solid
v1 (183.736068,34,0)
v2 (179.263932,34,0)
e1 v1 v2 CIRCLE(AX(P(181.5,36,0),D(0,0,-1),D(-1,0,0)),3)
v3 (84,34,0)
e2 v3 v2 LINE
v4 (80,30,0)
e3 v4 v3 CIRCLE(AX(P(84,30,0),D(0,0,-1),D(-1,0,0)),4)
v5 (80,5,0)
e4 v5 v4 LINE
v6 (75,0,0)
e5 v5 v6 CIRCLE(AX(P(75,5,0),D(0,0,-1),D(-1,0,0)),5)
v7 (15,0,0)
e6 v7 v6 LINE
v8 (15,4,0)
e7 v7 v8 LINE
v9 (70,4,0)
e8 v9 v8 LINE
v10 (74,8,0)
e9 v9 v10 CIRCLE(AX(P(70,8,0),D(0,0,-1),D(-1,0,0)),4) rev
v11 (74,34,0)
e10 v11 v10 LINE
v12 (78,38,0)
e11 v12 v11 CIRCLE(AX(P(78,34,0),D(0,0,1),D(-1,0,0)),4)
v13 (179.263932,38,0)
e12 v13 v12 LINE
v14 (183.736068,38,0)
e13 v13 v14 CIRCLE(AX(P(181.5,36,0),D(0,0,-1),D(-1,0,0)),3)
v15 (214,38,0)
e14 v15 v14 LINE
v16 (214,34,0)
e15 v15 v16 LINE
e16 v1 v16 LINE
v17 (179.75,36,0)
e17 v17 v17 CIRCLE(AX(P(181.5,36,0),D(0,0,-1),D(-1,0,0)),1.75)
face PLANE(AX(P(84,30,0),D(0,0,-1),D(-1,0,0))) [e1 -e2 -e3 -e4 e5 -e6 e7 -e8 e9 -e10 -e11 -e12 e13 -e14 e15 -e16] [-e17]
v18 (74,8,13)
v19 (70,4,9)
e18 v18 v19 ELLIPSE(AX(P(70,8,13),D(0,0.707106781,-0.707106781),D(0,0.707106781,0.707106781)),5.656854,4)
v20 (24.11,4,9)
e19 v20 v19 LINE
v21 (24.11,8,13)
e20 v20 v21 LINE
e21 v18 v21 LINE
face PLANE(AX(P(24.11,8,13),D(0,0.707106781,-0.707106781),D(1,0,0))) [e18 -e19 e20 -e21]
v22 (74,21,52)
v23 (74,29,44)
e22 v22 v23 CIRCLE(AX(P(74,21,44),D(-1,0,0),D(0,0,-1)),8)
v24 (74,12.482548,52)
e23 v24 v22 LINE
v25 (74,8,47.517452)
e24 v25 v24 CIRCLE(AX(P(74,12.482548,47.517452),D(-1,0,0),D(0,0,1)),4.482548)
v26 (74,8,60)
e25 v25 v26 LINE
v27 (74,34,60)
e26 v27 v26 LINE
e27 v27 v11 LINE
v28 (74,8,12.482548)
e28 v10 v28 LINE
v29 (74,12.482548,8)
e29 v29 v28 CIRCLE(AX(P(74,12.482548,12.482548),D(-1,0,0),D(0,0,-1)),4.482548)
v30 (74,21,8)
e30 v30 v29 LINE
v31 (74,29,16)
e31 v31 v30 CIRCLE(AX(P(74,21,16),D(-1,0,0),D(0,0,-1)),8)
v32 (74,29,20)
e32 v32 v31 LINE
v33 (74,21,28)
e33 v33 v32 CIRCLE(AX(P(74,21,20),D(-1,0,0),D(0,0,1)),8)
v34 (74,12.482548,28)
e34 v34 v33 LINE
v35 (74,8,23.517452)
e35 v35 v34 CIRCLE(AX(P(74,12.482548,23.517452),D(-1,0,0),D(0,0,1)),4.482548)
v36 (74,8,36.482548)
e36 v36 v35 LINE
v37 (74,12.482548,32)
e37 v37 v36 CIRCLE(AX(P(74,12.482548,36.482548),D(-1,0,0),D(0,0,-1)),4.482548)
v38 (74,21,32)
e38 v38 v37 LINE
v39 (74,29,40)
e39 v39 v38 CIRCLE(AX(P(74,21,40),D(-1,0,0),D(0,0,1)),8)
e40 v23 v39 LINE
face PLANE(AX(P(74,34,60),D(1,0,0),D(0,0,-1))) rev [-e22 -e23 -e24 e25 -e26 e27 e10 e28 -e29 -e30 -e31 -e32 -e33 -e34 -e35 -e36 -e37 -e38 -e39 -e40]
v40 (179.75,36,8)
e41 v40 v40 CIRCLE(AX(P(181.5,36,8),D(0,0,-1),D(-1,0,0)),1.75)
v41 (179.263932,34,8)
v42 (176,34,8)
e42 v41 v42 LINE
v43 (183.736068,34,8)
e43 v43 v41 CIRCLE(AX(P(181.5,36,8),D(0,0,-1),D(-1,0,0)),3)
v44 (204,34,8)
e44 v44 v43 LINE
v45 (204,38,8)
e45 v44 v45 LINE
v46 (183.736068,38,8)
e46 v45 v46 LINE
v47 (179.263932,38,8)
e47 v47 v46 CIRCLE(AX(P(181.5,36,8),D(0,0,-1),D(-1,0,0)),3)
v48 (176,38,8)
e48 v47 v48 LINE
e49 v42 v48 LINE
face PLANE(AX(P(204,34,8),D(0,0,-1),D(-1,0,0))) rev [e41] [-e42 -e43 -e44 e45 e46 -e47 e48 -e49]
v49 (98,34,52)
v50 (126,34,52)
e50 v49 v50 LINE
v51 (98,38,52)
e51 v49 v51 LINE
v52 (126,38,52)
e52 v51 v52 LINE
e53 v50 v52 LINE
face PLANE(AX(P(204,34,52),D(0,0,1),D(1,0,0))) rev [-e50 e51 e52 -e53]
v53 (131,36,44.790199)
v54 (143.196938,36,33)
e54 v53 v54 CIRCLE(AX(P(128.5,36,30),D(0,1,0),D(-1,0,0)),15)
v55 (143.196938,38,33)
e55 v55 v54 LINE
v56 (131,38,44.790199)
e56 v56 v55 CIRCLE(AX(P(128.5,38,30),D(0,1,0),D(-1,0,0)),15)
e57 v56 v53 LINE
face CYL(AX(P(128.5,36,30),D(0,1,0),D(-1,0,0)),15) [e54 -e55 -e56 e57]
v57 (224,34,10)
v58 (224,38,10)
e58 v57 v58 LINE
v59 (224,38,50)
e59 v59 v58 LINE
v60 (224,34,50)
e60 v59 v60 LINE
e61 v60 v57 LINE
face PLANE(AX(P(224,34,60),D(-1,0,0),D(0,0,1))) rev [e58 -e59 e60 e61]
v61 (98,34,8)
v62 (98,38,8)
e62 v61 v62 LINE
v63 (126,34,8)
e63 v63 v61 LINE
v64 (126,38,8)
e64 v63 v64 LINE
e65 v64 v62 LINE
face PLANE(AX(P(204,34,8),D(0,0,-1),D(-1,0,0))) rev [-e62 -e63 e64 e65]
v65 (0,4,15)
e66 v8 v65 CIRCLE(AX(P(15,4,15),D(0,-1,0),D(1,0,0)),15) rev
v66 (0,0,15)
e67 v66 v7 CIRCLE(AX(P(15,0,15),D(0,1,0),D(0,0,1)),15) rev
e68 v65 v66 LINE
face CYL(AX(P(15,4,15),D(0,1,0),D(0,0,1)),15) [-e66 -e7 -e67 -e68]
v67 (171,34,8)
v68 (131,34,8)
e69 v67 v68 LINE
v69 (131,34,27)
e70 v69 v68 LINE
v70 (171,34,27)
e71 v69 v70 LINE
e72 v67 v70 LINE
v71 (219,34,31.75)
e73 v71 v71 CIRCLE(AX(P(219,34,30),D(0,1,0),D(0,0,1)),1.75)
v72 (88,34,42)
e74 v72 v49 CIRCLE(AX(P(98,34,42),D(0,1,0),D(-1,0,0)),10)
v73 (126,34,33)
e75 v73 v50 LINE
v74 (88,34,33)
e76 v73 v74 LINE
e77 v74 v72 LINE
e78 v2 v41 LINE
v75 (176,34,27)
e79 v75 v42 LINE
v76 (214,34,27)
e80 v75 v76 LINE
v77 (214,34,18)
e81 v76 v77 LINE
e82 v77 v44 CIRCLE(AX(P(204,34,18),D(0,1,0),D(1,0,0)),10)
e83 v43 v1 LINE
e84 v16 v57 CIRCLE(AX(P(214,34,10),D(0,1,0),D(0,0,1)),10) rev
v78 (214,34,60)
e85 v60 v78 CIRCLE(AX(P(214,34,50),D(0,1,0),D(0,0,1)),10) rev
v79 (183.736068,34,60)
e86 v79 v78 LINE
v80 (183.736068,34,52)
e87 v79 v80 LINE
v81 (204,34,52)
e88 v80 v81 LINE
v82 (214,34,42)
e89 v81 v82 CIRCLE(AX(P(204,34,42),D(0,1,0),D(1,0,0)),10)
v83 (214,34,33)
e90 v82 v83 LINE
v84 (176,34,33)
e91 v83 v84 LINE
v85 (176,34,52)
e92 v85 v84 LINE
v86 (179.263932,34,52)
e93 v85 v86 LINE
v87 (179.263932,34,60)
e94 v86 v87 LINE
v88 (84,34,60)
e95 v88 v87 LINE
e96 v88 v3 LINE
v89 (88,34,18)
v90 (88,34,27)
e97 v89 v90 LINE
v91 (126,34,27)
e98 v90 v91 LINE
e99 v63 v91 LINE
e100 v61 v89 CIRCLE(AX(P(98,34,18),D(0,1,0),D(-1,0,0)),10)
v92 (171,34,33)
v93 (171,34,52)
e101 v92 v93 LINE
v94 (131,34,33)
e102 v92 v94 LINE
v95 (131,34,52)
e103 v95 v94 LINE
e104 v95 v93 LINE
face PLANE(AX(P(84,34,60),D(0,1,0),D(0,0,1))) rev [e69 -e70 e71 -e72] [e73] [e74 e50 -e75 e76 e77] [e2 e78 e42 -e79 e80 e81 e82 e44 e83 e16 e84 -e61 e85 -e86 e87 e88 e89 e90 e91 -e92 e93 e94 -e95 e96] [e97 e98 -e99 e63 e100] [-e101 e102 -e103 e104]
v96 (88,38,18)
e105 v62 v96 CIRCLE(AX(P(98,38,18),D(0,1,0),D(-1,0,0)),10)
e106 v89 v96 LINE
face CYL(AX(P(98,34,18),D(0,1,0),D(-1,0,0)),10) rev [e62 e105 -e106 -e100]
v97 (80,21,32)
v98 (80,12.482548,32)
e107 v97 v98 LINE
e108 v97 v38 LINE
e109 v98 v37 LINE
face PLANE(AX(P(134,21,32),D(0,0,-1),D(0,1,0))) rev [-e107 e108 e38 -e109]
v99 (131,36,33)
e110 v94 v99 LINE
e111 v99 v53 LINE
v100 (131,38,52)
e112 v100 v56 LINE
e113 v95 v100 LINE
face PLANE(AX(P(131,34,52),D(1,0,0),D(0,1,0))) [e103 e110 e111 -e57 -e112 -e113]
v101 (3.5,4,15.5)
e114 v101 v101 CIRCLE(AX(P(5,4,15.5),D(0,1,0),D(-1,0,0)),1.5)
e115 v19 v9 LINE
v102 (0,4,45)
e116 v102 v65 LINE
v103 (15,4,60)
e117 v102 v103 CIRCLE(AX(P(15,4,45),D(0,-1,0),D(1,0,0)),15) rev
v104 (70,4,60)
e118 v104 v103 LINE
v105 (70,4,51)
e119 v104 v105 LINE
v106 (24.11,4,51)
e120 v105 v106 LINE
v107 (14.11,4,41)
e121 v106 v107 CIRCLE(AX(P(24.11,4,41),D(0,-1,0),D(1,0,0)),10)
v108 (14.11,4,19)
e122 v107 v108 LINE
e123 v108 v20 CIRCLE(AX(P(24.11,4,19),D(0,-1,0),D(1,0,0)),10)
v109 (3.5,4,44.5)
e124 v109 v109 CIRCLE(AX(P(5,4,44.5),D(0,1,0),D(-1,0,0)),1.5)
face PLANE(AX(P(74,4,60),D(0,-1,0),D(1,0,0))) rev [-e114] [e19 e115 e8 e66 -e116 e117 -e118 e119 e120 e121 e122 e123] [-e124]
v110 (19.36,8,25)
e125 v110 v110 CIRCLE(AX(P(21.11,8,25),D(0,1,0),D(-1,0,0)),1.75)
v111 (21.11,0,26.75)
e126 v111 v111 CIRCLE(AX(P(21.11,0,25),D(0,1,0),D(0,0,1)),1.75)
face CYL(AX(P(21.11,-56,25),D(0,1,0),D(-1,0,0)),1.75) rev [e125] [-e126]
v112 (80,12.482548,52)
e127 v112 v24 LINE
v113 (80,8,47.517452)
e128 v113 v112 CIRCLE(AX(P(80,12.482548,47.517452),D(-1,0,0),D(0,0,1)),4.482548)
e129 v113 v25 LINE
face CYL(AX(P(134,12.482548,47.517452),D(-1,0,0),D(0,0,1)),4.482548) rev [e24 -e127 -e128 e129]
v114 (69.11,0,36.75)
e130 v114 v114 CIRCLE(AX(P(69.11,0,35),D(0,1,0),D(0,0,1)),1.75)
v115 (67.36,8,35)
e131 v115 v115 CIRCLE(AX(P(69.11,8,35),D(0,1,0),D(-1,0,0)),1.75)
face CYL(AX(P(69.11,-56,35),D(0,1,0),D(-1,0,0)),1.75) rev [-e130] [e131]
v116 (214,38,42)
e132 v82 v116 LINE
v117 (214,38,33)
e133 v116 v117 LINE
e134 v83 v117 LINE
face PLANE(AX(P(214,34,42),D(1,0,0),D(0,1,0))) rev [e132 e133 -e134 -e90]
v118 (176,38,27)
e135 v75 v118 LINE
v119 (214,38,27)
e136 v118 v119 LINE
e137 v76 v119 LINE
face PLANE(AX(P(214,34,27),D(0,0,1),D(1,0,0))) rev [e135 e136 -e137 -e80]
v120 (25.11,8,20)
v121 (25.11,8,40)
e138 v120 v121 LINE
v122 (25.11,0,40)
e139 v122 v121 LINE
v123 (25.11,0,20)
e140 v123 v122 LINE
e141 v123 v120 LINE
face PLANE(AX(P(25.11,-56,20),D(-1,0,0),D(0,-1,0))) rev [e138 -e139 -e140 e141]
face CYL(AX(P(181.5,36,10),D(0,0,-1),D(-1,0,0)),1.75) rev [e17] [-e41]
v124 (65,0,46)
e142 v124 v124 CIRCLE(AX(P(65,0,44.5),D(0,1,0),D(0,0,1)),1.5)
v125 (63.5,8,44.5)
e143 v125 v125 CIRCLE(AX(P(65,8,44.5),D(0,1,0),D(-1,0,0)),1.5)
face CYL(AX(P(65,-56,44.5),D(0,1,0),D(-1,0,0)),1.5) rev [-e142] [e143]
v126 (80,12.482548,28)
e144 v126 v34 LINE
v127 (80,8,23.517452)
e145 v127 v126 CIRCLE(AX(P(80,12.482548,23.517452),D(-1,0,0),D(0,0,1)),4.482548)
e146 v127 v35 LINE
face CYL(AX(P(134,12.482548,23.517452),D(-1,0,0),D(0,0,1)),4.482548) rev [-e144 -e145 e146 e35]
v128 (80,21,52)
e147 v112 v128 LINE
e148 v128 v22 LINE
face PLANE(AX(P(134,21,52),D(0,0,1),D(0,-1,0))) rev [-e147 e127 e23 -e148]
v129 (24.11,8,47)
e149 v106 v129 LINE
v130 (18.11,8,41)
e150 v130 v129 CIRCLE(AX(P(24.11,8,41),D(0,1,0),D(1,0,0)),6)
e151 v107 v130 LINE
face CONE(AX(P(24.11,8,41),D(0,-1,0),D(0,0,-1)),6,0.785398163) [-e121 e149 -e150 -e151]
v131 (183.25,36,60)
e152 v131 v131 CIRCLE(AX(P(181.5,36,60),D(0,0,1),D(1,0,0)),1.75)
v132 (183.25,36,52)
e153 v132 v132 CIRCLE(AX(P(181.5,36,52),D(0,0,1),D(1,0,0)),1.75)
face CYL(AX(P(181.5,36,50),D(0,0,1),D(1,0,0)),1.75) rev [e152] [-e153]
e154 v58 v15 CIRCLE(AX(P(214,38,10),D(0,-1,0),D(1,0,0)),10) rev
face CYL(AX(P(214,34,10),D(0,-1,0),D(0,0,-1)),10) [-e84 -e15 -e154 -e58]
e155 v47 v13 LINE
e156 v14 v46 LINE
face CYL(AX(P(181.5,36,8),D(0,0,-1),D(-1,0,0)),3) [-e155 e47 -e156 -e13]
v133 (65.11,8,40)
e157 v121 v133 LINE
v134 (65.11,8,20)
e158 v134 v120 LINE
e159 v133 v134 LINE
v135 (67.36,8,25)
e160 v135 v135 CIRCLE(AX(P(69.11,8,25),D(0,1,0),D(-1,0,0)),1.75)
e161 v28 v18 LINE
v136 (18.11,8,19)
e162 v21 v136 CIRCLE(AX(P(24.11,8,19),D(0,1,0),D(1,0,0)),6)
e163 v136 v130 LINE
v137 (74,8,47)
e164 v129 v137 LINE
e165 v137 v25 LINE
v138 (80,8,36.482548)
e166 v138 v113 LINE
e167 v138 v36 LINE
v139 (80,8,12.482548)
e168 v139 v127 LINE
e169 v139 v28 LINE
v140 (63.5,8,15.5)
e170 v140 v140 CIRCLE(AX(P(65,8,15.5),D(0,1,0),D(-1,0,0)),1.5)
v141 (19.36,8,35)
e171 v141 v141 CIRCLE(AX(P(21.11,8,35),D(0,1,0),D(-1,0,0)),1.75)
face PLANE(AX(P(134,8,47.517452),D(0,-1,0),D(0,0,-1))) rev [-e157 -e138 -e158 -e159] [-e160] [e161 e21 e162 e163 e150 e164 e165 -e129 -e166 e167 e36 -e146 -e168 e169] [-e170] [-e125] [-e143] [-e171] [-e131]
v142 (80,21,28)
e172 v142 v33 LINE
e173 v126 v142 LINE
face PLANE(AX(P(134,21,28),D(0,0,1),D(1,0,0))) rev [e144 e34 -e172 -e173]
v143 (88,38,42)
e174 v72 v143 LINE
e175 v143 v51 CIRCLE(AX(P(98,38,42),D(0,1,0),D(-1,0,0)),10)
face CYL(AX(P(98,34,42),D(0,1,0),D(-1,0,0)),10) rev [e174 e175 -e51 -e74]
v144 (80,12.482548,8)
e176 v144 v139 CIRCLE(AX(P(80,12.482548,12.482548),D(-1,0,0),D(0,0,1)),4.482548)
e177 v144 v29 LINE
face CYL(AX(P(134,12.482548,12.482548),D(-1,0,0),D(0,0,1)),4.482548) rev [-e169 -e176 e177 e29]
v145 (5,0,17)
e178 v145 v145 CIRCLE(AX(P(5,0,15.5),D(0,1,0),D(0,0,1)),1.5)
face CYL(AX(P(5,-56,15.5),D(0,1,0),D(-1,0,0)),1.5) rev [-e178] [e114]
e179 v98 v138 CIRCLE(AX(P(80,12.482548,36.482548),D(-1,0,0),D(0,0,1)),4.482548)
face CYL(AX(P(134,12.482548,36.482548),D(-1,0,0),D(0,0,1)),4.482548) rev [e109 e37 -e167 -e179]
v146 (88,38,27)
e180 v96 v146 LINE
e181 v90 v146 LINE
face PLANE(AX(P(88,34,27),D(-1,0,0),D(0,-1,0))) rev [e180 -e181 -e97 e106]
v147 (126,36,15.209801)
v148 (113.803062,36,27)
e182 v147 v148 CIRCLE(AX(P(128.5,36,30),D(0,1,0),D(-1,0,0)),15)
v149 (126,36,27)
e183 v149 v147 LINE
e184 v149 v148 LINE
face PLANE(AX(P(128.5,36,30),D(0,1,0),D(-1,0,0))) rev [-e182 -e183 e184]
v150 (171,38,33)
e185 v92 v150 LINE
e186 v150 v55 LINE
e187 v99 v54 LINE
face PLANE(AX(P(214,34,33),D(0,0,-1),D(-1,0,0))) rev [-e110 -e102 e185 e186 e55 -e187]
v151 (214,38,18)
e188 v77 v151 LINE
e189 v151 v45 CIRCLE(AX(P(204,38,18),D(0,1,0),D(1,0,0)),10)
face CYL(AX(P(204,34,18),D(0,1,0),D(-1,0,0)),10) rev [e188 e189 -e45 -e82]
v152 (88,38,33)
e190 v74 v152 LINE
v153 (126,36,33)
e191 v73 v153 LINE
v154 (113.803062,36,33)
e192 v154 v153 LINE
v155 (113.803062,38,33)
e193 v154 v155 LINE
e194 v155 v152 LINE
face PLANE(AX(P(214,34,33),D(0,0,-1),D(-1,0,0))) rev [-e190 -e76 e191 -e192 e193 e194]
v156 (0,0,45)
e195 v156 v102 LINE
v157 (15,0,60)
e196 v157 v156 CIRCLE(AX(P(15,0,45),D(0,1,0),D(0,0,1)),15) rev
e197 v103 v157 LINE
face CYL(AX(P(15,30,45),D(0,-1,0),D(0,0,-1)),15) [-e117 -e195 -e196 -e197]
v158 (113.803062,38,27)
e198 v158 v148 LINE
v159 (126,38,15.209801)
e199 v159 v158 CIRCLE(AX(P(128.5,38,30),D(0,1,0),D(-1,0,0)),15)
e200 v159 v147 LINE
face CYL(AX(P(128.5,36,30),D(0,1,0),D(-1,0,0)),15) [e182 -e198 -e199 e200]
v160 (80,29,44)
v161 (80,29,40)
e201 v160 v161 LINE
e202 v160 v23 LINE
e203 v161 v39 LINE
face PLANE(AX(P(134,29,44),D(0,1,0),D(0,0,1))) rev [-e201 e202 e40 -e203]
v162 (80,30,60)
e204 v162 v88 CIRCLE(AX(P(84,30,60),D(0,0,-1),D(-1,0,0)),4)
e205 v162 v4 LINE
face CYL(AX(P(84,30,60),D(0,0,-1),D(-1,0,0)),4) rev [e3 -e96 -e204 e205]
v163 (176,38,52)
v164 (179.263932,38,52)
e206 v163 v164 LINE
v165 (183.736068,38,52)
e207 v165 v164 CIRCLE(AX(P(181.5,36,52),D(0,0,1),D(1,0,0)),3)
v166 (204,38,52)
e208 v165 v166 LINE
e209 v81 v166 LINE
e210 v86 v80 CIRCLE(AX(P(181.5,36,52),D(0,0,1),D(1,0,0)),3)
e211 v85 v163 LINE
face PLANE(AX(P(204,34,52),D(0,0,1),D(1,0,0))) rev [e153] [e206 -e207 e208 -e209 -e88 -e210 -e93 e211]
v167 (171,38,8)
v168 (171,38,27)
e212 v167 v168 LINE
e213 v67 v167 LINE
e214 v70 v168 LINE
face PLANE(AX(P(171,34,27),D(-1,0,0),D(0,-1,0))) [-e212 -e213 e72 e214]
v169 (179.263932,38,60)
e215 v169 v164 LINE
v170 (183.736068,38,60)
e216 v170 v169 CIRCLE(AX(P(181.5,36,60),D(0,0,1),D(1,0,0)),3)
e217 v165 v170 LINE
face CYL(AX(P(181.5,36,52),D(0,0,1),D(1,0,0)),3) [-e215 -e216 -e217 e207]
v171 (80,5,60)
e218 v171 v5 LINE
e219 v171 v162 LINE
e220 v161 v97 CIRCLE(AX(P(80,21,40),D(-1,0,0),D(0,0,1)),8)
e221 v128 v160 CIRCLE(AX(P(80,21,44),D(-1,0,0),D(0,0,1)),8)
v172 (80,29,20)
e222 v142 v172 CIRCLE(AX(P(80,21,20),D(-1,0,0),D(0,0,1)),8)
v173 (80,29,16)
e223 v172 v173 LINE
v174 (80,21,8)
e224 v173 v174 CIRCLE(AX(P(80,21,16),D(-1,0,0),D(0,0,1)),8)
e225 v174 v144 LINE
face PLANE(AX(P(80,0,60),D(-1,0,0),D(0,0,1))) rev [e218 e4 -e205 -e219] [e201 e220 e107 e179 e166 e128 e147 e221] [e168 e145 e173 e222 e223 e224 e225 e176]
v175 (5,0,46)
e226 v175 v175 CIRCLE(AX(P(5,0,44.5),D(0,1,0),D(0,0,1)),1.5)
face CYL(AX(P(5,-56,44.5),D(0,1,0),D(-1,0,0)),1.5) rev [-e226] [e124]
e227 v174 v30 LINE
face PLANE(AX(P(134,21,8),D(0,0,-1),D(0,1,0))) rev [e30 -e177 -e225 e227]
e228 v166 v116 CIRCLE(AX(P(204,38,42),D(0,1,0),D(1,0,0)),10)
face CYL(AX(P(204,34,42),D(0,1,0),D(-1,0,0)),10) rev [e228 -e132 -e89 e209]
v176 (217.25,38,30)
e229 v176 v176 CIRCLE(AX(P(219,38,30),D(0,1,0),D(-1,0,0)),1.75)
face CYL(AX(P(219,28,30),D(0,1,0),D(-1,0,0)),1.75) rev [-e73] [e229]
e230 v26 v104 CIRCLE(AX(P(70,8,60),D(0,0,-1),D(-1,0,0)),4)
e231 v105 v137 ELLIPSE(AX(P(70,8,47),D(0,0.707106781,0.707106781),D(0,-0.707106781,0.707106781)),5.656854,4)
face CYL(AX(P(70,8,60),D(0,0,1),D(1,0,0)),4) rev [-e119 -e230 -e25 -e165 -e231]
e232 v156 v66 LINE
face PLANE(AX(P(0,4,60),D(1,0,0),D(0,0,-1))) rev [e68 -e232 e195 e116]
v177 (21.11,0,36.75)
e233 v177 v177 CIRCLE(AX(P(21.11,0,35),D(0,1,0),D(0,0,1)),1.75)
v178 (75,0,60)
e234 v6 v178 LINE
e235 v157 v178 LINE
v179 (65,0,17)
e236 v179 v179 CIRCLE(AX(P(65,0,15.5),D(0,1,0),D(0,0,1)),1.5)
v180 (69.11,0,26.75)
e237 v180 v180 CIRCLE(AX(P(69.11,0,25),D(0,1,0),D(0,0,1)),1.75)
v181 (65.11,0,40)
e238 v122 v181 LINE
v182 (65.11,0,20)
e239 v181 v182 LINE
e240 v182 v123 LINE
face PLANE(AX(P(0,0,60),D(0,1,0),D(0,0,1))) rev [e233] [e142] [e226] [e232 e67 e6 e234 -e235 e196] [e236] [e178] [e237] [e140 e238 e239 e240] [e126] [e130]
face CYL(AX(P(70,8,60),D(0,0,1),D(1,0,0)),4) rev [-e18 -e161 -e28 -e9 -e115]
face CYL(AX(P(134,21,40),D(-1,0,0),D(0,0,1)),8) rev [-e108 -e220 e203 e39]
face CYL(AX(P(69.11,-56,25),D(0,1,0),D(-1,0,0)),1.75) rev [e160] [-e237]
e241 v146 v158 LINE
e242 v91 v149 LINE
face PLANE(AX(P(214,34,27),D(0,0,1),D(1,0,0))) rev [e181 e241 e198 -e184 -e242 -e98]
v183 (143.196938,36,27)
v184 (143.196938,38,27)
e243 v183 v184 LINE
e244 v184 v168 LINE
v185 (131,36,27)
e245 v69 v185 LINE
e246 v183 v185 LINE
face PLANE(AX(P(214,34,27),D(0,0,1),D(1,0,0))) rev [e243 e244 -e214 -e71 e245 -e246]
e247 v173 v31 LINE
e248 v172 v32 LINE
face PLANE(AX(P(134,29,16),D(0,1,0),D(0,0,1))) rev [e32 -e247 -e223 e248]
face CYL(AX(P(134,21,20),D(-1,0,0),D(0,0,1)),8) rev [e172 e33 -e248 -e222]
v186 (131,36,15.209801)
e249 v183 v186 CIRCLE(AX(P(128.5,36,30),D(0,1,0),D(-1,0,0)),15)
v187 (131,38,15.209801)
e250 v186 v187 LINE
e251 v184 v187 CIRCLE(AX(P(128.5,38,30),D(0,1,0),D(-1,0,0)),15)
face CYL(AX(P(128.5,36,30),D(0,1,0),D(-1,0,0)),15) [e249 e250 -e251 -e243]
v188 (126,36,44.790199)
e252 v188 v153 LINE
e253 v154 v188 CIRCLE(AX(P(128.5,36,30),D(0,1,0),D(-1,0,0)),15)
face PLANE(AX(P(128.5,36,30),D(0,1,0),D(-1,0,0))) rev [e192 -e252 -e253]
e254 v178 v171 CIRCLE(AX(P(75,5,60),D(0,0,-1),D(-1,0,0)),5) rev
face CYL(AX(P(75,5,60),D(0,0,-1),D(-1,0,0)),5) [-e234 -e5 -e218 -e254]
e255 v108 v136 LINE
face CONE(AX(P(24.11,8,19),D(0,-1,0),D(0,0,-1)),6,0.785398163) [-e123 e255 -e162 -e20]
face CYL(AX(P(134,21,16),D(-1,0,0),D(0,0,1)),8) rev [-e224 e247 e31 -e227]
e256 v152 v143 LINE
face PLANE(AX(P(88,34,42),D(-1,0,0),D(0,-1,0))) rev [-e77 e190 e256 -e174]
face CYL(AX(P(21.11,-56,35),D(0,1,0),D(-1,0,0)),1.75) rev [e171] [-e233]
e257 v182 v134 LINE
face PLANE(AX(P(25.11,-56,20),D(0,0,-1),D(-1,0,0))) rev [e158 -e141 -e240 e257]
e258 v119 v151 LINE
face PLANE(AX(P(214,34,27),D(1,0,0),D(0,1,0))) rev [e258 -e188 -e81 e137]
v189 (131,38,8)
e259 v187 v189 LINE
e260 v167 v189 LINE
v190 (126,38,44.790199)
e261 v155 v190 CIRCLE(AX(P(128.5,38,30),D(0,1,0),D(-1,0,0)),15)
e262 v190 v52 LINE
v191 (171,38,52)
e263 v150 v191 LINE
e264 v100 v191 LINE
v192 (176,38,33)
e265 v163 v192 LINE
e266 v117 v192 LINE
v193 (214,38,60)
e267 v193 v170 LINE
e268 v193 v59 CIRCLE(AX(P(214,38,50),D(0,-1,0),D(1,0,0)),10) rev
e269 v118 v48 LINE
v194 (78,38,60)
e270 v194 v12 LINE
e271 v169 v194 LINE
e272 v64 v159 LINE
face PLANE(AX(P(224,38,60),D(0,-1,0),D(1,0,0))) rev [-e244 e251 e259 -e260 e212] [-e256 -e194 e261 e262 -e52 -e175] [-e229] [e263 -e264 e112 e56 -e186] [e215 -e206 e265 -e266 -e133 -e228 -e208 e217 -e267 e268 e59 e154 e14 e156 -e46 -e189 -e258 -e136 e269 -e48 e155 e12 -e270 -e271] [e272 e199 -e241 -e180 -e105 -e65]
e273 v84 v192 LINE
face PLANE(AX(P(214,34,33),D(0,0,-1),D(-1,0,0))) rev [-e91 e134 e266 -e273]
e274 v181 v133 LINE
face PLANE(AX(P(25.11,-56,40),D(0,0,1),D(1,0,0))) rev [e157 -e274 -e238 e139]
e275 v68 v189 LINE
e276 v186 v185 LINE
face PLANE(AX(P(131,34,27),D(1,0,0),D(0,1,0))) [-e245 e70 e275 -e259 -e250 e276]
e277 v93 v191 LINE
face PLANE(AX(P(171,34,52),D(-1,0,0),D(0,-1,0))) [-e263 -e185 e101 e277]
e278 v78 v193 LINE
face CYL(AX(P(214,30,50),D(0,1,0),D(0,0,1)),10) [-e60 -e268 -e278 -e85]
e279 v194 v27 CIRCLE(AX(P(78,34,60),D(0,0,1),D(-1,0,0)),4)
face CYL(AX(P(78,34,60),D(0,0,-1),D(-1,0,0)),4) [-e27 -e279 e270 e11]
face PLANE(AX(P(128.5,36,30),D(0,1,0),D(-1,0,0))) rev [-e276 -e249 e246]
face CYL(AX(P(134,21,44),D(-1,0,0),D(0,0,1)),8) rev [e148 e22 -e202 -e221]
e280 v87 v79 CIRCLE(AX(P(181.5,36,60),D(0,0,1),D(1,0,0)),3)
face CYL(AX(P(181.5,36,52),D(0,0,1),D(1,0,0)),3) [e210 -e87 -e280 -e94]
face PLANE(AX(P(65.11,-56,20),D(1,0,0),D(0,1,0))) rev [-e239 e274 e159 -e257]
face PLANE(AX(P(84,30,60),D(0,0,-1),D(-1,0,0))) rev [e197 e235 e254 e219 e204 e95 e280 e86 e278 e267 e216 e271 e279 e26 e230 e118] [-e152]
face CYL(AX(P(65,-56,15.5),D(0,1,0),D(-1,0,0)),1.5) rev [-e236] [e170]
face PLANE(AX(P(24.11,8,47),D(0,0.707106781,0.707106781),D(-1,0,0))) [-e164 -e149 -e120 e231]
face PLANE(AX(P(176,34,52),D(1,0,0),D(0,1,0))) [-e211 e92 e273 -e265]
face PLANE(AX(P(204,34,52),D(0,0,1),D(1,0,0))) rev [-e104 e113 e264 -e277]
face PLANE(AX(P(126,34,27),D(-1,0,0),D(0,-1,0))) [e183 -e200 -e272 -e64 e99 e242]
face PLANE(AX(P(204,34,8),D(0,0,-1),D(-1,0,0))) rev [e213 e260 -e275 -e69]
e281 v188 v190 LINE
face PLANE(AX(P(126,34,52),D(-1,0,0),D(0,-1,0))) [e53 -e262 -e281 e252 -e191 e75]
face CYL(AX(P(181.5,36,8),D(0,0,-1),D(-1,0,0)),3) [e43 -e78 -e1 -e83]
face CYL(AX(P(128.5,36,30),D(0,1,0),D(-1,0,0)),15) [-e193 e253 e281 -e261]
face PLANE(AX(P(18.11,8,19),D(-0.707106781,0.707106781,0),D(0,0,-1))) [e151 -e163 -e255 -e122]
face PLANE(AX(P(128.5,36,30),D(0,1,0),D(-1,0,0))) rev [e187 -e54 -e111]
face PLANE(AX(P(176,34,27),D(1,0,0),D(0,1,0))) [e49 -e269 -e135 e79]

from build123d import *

# Parameters (mm, degrees)
Y_KSEKLIK_EKSTR_ZYON1_DEPTH     = 60
KES_EKSTR_ZYON1_DEPTH           = 60
IZIM3_R                         = 1.5
KES_EKSTR_ZYON2_DEPTH           = 60
RADYUS1_R                       = 15
RADYUS2_R                       = 5
IZIM4_R                         = 1.75
IZIM4_W                         = 40
IZIM4_H                         = 20
KES_EKSTR_ZYON3_DEPTH           = 60
Y_KSEKLIK_EKSTR_ZYON2_START     = 4
IZIM5_R                         = 1.75
IZIM5_R_2                       = 1.5
IZIM5_W                         = 40
IZIM5_H                         = 20
Y_KSEKLIK_EKSTR_ZYON2_DEPTH     = 4
PAH1_SIZE                       = 4
RADYUS3_R                       = 4
KES_EKSTR_ZYON4_DEPTH           = 4
Y_KSEKLIK_EKSTR_ZYON3_START     = -4
Y_KSEKLIK_EKSTR_ZYON3_OUTLINE_W = 5
Y_KSEKLIK_EKSTR_ZYON3_OUTLINE_H = 19
Y_KSEKLIK_EKSTR_ZYON3_DEPTH     = 4
IZIM8_R                         = 15
Y_KSEKLIK_EKSTR_ZYON4_DEPTH     = 2
Y_KSEKLIK_EKSTR_ZYON5_START     = -8
Y_KSEKLIK_EKSTR_ZYON5_DEPTH     = 8
IZIM10_R                        = 1.75
KES_EKSTR_ZYON5_DEPTH           = 10
Y_KSEKLIK_EKSTR_ZYON6_START     = -8
Y_KSEKLIK_EKSTR_ZYON6_DEPTH     = 8
KES_EKSTR_ZYON6_START           = -10
IZIM12_R                        = 1.75
KES_EKSTR_ZYON6_DEPTH           = 10
IZIM13_R                        = 1.75
KES_EKSTR_ZYON7_DEPTH           = 10
RADYUS4_R                       = 10


# Read off the part's stored shape, not the designer's step: Yükseklik-Ekstrüzyon3, Yükseklik-Ekstrüzyon5, Yükseklik-Ekstrüzyon6
with BuildPart() as part:
    # Çizim1 → Yükseklik-Ekstrüzyon1 (new body)
    with BuildSketch(Plane.XY):
        with BuildLine():
            Line((0, 0), (80, 0))
            Line((80, 0), (80, 30))
            ThreePointArc((80, 30), (81.171572875, 32.828427125), (84, 34))
            Line((84, 34), (224, 34))
            Line((224, 34), (224, 38))
            Line((224, 38), (78, 38))
            ThreePointArc((78, 38), (75.171572875, 36.828427125), (74, 34))
            Line((74, 34), (74, 4))
            Line((74, 4), (0, 4))
            Line((0, 4), (0, 0))
        make_face()
    extrude(amount=Y_KSEKLIK_EKSTR_ZYON1_DEPTH)

    # Çizim2 → Kes-Ekstrüzyon1 (cut)
    with BuildSketch(Plane.ZY.offset(-74)):
        with BuildLine():
            Line((16, 29), (20, 29))
            ThreePointArc((20, 29), (25.656854249, 26.656854249), (28, 21))
            Line((28, 21), (28, 12.482548154))
            ThreePointArc((28, 12.482548154), (26.687092043, 9.312907957), (23.517451846, 8))
            Line((23.517451846, 8), (12.482548154, 8))
            ThreePointArc((12.482548154, 8), (9.312907957, 9.312907957), (8, 12.482548154))
            Line((8, 12.482548154), (8, 21))
            ThreePointArc((8, 21), (10.343145751, 26.656854249), (16, 29))
        make_face()
        with BuildLine():
            Line((32, 21), (32, 12.482548154))
            ThreePointArc((32, 12.482548154), (33.312907957, 9.312907957), (36.482548154, 8))
            Line((36.482548154, 8), (47.517451846, 8))
            ThreePointArc((47.517451846, 8), (50.687092043, 9.312907957), (52, 12.482548154))
            Line((52, 12.482548154), (52, 21))
            ThreePointArc((52, 21), (49.656854249, 26.656854249), (44, 29))
            Line((44, 29), (40, 29))
            ThreePointArc((40, 29), (34.343145751, 26.656854249), (32, 21))
        make_face()
    extrude(amount=-KES_EKSTR_ZYON1_DEPTH, mode=Mode.SUBTRACT)

    # Çizim3 → Kes-Ekstrüzyon2 (cut)
    with BuildSketch(Plane(origin=(0, 4, 0), x_dir=(1, 0, 0), z_dir=(0, 1, 0))):
        with Locations(Location((5, -15.5, 0), (0, 0, 180))):
            Circle(IZIM3_R)
        with Locations(Location((5, -44.5, 0), (0, 0, 180))):
            Circle(IZIM3_R)
        with Locations(Location((65, -15.5, 0), (0, 0, 180))):
            Circle(IZIM3_R)
        with Locations(Location((65, -44.5, 0), (0, 0, 180))):
            Circle(IZIM3_R)
    extrude(amount=-KES_EKSTR_ZYON2_DEPTH, mode=Mode.SUBTRACT)

    # Radyus1
    radyus1_edges = [part.edges().sort_by_distance(p)[0] for p in [
        (0, 2, 0),
        (0, 2, 60),
    ]]
    fillet(radyus1_edges, radius=RADYUS1_R)

    # Radyus2
    radyus2_edges = [part.edges().sort_by_distance(p)[0] for p in [
        (80, 0, 30),
    ]]
    fillet(radyus2_edges, radius=RADYUS2_R)

    # Çizim4 → Kes-Ekstrüzyon3 (cut)
    with BuildSketch(Plane(origin=(0, 4, 0), x_dir=(1, 0, 0), z_dir=(0, 1, 0))):
        with Locations(Location((21.11, -25, 0), (0, 0, 180))):
            Circle(IZIM4_R)
        with Locations(Location((21.11, -35, 0), (0, 0, 180))):
            Circle(IZIM4_R)
        with Locations(Location((69.11, -25, 0), (0, 0, 180))):
            Circle(IZIM4_R)
        with Locations(Location((69.11, -35, 0), (0, 0, 180))):
            Circle(IZIM4_R)
        with Locations((45.11, -30)):
            Rectangle(IZIM4_W, IZIM4_H)
    extrude(amount=-KES_EKSTR_ZYON3_DEPTH, mode=Mode.SUBTRACT)

    # Çizim5 → Yükseklik-Ekstrüzyon2 (add)
    with BuildSketch(Plane(origin=(0, 4, 0), x_dir=(1, 0, 0), z_dir=(0, 1, 0)).offset(Y_KSEKLIK_EKSTR_ZYON2_START)):
        with BuildLine():
            Line((24.11, -13), (74, -13))
            Line((74, -13), (74, -47))
            Line((74, -47), (24.11, -47))
            ThreePointArc((24.11, -47), (19.867359313, -45.242640687), (18.11, -41))
            Line((18.11, -41), (18.11, -19))
            ThreePointArc((18.11, -19), (19.867359313, -14.757359313), (24.11, -13))
        make_face()
        with Locations(Location((21.11, -25, 0), (0, 0, 180))):
            Circle(IZIM5_R, mode=Mode.SUBTRACT)
        with Locations(Location((21.11, -35, 0), (0, 0, 180))):
            Circle(IZIM5_R, mode=Mode.SUBTRACT)
        with Locations(Location((65, -44.5, 0), (0, 0, 180))):
            Circle(IZIM5_R_2, mode=Mode.SUBTRACT)
        with Locations(Location((69.11, -25, 0), (0, 0, 180))):
            Circle(IZIM5_R, mode=Mode.SUBTRACT)
        with Locations(Location((69.11, -35, 0), (0, 0, 180))):
            Circle(IZIM5_R, mode=Mode.SUBTRACT)
        with Locations(Location((65, -15.5, 0), (0, 0, 180))):
            Circle(IZIM5_R_2, mode=Mode.SUBTRACT)
        with Locations((45.11, -30)):
            Rectangle(IZIM5_W, IZIM5_H, mode=Mode.SUBTRACT)
    extrude(amount=-Y_KSEKLIK_EKSTR_ZYON2_DEPTH)

    # Pah1
    pah1_edges = [part.edges().sort_by_distance(p)[0] for p in [
        (49.055, 4, 13),
        (19.867359313, 4, 14.757359313),
        (18.11, 4, 30),
        (19.867359313, 4, 45.242640687),
        (49.055, 4, 47),
    ]]
    chamfer(pah1_edges, length=PAH1_SIZE - 0.0001)  # a hair under: the kernel refuses the full size

    # Radyus3
    radyus3_edges = [part.edges().sort_by_distance(p)[0] for p in [
        (74, 4, 55.49995),
        (74, 4, 4.50005),
    ]]
    fillet(radyus3_edges, radius=RADYUS3_R - 0.0001)  # a hair under: the kernel refuses the full size

    # Çizim6 → Kes-Ekstrüzyon4 (cut)
    with BuildSketch(Plane(origin=(0, 38, 0), x_dir=(1, 0, 0), z_dir=(0, 1, 0))):
        with BuildLine():
            Line((204, -52), (98, -52))
            ThreePointArc((98, -52), (90.928932188, -49.071067812), (88, -42))
            Line((88, -42), (88, -33))
            Line((88, -33), (214, -33))
            Line((214, -33), (214, -42))
            ThreePointArc((214, -42), (211.071067812, -49.071067812), (204, -52))
        make_face()
        with BuildLine():
            Line((204, -8), (98, -8))
            ThreePointArc((98, -8), (90.928932188, -10.928932188), (88, -18))
            Line((88, -18), (88, -27))
            Line((88, -27), (214, -27))
            Line((214, -27), (214, -18))
            ThreePointArc((214, -18), (211.071067812, -10.928932188), (204, -8))
        make_face()
    extrude(amount=-KES_EKSTR_ZYON4_DEPTH, mode=Mode.SUBTRACT)

    # Yükseklik-Ekstrüzyon3 outline → Yükseklik-Ekstrüzyon3 (add)
    with BuildSketch(Plane(origin=(0, 38, 0), x_dir=(1, 0, 0), z_dir=(0, 1, 0)).offset(Y_KSEKLIK_EKSTR_ZYON3_START)):
        with Locations((173.5, -42.5)):
            Rectangle(Y_KSEKLIK_EKSTR_ZYON3_OUTLINE_W, Y_KSEKLIK_EKSTR_ZYON3_OUTLINE_H)
        with Locations((128.5, -42.5)):
            Rectangle(Y_KSEKLIK_EKSTR_ZYON3_OUTLINE_W, Y_KSEKLIK_EKSTR_ZYON3_OUTLINE_H)
        with Locations((173.5, -17.5)):
            Rectangle(Y_KSEKLIK_EKSTR_ZYON3_OUTLINE_W, Y_KSEKLIK_EKSTR_ZYON3_OUTLINE_H)
        with Locations((128.5, -17.5)):
            Rectangle(Y_KSEKLIK_EKSTR_ZYON3_OUTLINE_W, Y_KSEKLIK_EKSTR_ZYON3_OUTLINE_H)
    extrude(amount=Y_KSEKLIK_EKSTR_ZYON3_DEPTH)

    # Çizim8 → Yükseklik-Ekstrüzyon4 (add)
    with BuildSketch(Plane(origin=(0, 38, 0), x_dir=(1, 0, 0), z_dir=(0, 1, 0))):
        with Locations((128.5, -30)):
            Circle(IZIM8_R)
    extrude(amount=-Y_KSEKLIK_EKSTR_ZYON4_DEPTH)

    # Yükseklik-Ekstrüzyon5 outline → Yükseklik-Ekstrüzyon5 (add)
    with BuildSketch(Plane.XY.offset(60).offset(Y_KSEKLIK_EKSTR_ZYON5_START)):
        with BuildLine():
            Line((179.263932023, 38), (183.736067977, 38))
            ThreePointArc((183.736067977, 38), (181.5, 39), (179.263932023, 38))
        make_face()
        with BuildLine():
            Line((183.736067977, 34), (179.263932023, 34))
            ThreePointArc((179.263932023, 34), (181.5, 33), (183.736067977, 34))
        make_face()
    extrude(amount=Y_KSEKLIK_EKSTR_ZYON5_DEPTH)

    # Çizim10 → Kes-Ekstrüzyon5 (cut)
    with BuildSketch(Plane.XY.offset(60)):
        with Locations((181.5, 36)):
            Circle(IZIM10_R)
    extrude(amount=-KES_EKSTR_ZYON5_DEPTH, mode=Mode.SUBTRACT)

    # Yükseklik-Ekstrüzyon6 outline → Yükseklik-Ekstrüzyon6 (add)
    with BuildSketch(Plane(origin=(0, 0, 0), x_dir=(-1, 0, 0), z_dir=(0, 0, -1)).offset(Y_KSEKLIK_EKSTR_ZYON6_START)):
        with BuildLine():
            Line((-183.736067977, 38), (-179.263932023, 38))
            ThreePointArc((-179.263932023, 38), (-181.5, 39), (-183.736067977, 38))
        make_face()
        with BuildLine():
            Line((-179.263932023, 34), (-183.736067977, 34))
            ThreePointArc((-183.736067977, 34), (-181.5, 33), (-179.263932023, 34))
        make_face()
    extrude(amount=Y_KSEKLIK_EKSTR_ZYON6_DEPTH)

    # Çizim12 → Kes-Ekstrüzyon6 (cut)
    with BuildSketch(Plane(origin=(0, 0, 0), x_dir=(-1, 0, 0), z_dir=(0, 0, -1)).offset(KES_EKSTR_ZYON6_START)):
        with Locations(Location((-181.5, 36, 0), (0, 0, 180))):
            Circle(IZIM12_R)
    extrude(amount=KES_EKSTR_ZYON6_DEPTH, mode=Mode.SUBTRACT)

    # Çizim13 → Kes-Ekstrüzyon7 (cut)
    with BuildSketch(Plane(origin=(0, 38, 0), x_dir=(1, 0, 0), z_dir=(0, 1, 0))):
        with Locations(Location((219, -30, 0), (0, 0, 180))):
            Circle(IZIM13_R)
    extrude(amount=-KES_EKSTR_ZYON7_DEPTH, mode=Mode.SUBTRACT)

    # Radyus4
    radyus4_edges = [part.edges().sort_by_distance(p)[0] for p in [
        (224, 36, 0),
        (224, 36, 60),
    ]]
    fillet(radyus4_edges, radius=RADYUS4_R)


solid = part.part
